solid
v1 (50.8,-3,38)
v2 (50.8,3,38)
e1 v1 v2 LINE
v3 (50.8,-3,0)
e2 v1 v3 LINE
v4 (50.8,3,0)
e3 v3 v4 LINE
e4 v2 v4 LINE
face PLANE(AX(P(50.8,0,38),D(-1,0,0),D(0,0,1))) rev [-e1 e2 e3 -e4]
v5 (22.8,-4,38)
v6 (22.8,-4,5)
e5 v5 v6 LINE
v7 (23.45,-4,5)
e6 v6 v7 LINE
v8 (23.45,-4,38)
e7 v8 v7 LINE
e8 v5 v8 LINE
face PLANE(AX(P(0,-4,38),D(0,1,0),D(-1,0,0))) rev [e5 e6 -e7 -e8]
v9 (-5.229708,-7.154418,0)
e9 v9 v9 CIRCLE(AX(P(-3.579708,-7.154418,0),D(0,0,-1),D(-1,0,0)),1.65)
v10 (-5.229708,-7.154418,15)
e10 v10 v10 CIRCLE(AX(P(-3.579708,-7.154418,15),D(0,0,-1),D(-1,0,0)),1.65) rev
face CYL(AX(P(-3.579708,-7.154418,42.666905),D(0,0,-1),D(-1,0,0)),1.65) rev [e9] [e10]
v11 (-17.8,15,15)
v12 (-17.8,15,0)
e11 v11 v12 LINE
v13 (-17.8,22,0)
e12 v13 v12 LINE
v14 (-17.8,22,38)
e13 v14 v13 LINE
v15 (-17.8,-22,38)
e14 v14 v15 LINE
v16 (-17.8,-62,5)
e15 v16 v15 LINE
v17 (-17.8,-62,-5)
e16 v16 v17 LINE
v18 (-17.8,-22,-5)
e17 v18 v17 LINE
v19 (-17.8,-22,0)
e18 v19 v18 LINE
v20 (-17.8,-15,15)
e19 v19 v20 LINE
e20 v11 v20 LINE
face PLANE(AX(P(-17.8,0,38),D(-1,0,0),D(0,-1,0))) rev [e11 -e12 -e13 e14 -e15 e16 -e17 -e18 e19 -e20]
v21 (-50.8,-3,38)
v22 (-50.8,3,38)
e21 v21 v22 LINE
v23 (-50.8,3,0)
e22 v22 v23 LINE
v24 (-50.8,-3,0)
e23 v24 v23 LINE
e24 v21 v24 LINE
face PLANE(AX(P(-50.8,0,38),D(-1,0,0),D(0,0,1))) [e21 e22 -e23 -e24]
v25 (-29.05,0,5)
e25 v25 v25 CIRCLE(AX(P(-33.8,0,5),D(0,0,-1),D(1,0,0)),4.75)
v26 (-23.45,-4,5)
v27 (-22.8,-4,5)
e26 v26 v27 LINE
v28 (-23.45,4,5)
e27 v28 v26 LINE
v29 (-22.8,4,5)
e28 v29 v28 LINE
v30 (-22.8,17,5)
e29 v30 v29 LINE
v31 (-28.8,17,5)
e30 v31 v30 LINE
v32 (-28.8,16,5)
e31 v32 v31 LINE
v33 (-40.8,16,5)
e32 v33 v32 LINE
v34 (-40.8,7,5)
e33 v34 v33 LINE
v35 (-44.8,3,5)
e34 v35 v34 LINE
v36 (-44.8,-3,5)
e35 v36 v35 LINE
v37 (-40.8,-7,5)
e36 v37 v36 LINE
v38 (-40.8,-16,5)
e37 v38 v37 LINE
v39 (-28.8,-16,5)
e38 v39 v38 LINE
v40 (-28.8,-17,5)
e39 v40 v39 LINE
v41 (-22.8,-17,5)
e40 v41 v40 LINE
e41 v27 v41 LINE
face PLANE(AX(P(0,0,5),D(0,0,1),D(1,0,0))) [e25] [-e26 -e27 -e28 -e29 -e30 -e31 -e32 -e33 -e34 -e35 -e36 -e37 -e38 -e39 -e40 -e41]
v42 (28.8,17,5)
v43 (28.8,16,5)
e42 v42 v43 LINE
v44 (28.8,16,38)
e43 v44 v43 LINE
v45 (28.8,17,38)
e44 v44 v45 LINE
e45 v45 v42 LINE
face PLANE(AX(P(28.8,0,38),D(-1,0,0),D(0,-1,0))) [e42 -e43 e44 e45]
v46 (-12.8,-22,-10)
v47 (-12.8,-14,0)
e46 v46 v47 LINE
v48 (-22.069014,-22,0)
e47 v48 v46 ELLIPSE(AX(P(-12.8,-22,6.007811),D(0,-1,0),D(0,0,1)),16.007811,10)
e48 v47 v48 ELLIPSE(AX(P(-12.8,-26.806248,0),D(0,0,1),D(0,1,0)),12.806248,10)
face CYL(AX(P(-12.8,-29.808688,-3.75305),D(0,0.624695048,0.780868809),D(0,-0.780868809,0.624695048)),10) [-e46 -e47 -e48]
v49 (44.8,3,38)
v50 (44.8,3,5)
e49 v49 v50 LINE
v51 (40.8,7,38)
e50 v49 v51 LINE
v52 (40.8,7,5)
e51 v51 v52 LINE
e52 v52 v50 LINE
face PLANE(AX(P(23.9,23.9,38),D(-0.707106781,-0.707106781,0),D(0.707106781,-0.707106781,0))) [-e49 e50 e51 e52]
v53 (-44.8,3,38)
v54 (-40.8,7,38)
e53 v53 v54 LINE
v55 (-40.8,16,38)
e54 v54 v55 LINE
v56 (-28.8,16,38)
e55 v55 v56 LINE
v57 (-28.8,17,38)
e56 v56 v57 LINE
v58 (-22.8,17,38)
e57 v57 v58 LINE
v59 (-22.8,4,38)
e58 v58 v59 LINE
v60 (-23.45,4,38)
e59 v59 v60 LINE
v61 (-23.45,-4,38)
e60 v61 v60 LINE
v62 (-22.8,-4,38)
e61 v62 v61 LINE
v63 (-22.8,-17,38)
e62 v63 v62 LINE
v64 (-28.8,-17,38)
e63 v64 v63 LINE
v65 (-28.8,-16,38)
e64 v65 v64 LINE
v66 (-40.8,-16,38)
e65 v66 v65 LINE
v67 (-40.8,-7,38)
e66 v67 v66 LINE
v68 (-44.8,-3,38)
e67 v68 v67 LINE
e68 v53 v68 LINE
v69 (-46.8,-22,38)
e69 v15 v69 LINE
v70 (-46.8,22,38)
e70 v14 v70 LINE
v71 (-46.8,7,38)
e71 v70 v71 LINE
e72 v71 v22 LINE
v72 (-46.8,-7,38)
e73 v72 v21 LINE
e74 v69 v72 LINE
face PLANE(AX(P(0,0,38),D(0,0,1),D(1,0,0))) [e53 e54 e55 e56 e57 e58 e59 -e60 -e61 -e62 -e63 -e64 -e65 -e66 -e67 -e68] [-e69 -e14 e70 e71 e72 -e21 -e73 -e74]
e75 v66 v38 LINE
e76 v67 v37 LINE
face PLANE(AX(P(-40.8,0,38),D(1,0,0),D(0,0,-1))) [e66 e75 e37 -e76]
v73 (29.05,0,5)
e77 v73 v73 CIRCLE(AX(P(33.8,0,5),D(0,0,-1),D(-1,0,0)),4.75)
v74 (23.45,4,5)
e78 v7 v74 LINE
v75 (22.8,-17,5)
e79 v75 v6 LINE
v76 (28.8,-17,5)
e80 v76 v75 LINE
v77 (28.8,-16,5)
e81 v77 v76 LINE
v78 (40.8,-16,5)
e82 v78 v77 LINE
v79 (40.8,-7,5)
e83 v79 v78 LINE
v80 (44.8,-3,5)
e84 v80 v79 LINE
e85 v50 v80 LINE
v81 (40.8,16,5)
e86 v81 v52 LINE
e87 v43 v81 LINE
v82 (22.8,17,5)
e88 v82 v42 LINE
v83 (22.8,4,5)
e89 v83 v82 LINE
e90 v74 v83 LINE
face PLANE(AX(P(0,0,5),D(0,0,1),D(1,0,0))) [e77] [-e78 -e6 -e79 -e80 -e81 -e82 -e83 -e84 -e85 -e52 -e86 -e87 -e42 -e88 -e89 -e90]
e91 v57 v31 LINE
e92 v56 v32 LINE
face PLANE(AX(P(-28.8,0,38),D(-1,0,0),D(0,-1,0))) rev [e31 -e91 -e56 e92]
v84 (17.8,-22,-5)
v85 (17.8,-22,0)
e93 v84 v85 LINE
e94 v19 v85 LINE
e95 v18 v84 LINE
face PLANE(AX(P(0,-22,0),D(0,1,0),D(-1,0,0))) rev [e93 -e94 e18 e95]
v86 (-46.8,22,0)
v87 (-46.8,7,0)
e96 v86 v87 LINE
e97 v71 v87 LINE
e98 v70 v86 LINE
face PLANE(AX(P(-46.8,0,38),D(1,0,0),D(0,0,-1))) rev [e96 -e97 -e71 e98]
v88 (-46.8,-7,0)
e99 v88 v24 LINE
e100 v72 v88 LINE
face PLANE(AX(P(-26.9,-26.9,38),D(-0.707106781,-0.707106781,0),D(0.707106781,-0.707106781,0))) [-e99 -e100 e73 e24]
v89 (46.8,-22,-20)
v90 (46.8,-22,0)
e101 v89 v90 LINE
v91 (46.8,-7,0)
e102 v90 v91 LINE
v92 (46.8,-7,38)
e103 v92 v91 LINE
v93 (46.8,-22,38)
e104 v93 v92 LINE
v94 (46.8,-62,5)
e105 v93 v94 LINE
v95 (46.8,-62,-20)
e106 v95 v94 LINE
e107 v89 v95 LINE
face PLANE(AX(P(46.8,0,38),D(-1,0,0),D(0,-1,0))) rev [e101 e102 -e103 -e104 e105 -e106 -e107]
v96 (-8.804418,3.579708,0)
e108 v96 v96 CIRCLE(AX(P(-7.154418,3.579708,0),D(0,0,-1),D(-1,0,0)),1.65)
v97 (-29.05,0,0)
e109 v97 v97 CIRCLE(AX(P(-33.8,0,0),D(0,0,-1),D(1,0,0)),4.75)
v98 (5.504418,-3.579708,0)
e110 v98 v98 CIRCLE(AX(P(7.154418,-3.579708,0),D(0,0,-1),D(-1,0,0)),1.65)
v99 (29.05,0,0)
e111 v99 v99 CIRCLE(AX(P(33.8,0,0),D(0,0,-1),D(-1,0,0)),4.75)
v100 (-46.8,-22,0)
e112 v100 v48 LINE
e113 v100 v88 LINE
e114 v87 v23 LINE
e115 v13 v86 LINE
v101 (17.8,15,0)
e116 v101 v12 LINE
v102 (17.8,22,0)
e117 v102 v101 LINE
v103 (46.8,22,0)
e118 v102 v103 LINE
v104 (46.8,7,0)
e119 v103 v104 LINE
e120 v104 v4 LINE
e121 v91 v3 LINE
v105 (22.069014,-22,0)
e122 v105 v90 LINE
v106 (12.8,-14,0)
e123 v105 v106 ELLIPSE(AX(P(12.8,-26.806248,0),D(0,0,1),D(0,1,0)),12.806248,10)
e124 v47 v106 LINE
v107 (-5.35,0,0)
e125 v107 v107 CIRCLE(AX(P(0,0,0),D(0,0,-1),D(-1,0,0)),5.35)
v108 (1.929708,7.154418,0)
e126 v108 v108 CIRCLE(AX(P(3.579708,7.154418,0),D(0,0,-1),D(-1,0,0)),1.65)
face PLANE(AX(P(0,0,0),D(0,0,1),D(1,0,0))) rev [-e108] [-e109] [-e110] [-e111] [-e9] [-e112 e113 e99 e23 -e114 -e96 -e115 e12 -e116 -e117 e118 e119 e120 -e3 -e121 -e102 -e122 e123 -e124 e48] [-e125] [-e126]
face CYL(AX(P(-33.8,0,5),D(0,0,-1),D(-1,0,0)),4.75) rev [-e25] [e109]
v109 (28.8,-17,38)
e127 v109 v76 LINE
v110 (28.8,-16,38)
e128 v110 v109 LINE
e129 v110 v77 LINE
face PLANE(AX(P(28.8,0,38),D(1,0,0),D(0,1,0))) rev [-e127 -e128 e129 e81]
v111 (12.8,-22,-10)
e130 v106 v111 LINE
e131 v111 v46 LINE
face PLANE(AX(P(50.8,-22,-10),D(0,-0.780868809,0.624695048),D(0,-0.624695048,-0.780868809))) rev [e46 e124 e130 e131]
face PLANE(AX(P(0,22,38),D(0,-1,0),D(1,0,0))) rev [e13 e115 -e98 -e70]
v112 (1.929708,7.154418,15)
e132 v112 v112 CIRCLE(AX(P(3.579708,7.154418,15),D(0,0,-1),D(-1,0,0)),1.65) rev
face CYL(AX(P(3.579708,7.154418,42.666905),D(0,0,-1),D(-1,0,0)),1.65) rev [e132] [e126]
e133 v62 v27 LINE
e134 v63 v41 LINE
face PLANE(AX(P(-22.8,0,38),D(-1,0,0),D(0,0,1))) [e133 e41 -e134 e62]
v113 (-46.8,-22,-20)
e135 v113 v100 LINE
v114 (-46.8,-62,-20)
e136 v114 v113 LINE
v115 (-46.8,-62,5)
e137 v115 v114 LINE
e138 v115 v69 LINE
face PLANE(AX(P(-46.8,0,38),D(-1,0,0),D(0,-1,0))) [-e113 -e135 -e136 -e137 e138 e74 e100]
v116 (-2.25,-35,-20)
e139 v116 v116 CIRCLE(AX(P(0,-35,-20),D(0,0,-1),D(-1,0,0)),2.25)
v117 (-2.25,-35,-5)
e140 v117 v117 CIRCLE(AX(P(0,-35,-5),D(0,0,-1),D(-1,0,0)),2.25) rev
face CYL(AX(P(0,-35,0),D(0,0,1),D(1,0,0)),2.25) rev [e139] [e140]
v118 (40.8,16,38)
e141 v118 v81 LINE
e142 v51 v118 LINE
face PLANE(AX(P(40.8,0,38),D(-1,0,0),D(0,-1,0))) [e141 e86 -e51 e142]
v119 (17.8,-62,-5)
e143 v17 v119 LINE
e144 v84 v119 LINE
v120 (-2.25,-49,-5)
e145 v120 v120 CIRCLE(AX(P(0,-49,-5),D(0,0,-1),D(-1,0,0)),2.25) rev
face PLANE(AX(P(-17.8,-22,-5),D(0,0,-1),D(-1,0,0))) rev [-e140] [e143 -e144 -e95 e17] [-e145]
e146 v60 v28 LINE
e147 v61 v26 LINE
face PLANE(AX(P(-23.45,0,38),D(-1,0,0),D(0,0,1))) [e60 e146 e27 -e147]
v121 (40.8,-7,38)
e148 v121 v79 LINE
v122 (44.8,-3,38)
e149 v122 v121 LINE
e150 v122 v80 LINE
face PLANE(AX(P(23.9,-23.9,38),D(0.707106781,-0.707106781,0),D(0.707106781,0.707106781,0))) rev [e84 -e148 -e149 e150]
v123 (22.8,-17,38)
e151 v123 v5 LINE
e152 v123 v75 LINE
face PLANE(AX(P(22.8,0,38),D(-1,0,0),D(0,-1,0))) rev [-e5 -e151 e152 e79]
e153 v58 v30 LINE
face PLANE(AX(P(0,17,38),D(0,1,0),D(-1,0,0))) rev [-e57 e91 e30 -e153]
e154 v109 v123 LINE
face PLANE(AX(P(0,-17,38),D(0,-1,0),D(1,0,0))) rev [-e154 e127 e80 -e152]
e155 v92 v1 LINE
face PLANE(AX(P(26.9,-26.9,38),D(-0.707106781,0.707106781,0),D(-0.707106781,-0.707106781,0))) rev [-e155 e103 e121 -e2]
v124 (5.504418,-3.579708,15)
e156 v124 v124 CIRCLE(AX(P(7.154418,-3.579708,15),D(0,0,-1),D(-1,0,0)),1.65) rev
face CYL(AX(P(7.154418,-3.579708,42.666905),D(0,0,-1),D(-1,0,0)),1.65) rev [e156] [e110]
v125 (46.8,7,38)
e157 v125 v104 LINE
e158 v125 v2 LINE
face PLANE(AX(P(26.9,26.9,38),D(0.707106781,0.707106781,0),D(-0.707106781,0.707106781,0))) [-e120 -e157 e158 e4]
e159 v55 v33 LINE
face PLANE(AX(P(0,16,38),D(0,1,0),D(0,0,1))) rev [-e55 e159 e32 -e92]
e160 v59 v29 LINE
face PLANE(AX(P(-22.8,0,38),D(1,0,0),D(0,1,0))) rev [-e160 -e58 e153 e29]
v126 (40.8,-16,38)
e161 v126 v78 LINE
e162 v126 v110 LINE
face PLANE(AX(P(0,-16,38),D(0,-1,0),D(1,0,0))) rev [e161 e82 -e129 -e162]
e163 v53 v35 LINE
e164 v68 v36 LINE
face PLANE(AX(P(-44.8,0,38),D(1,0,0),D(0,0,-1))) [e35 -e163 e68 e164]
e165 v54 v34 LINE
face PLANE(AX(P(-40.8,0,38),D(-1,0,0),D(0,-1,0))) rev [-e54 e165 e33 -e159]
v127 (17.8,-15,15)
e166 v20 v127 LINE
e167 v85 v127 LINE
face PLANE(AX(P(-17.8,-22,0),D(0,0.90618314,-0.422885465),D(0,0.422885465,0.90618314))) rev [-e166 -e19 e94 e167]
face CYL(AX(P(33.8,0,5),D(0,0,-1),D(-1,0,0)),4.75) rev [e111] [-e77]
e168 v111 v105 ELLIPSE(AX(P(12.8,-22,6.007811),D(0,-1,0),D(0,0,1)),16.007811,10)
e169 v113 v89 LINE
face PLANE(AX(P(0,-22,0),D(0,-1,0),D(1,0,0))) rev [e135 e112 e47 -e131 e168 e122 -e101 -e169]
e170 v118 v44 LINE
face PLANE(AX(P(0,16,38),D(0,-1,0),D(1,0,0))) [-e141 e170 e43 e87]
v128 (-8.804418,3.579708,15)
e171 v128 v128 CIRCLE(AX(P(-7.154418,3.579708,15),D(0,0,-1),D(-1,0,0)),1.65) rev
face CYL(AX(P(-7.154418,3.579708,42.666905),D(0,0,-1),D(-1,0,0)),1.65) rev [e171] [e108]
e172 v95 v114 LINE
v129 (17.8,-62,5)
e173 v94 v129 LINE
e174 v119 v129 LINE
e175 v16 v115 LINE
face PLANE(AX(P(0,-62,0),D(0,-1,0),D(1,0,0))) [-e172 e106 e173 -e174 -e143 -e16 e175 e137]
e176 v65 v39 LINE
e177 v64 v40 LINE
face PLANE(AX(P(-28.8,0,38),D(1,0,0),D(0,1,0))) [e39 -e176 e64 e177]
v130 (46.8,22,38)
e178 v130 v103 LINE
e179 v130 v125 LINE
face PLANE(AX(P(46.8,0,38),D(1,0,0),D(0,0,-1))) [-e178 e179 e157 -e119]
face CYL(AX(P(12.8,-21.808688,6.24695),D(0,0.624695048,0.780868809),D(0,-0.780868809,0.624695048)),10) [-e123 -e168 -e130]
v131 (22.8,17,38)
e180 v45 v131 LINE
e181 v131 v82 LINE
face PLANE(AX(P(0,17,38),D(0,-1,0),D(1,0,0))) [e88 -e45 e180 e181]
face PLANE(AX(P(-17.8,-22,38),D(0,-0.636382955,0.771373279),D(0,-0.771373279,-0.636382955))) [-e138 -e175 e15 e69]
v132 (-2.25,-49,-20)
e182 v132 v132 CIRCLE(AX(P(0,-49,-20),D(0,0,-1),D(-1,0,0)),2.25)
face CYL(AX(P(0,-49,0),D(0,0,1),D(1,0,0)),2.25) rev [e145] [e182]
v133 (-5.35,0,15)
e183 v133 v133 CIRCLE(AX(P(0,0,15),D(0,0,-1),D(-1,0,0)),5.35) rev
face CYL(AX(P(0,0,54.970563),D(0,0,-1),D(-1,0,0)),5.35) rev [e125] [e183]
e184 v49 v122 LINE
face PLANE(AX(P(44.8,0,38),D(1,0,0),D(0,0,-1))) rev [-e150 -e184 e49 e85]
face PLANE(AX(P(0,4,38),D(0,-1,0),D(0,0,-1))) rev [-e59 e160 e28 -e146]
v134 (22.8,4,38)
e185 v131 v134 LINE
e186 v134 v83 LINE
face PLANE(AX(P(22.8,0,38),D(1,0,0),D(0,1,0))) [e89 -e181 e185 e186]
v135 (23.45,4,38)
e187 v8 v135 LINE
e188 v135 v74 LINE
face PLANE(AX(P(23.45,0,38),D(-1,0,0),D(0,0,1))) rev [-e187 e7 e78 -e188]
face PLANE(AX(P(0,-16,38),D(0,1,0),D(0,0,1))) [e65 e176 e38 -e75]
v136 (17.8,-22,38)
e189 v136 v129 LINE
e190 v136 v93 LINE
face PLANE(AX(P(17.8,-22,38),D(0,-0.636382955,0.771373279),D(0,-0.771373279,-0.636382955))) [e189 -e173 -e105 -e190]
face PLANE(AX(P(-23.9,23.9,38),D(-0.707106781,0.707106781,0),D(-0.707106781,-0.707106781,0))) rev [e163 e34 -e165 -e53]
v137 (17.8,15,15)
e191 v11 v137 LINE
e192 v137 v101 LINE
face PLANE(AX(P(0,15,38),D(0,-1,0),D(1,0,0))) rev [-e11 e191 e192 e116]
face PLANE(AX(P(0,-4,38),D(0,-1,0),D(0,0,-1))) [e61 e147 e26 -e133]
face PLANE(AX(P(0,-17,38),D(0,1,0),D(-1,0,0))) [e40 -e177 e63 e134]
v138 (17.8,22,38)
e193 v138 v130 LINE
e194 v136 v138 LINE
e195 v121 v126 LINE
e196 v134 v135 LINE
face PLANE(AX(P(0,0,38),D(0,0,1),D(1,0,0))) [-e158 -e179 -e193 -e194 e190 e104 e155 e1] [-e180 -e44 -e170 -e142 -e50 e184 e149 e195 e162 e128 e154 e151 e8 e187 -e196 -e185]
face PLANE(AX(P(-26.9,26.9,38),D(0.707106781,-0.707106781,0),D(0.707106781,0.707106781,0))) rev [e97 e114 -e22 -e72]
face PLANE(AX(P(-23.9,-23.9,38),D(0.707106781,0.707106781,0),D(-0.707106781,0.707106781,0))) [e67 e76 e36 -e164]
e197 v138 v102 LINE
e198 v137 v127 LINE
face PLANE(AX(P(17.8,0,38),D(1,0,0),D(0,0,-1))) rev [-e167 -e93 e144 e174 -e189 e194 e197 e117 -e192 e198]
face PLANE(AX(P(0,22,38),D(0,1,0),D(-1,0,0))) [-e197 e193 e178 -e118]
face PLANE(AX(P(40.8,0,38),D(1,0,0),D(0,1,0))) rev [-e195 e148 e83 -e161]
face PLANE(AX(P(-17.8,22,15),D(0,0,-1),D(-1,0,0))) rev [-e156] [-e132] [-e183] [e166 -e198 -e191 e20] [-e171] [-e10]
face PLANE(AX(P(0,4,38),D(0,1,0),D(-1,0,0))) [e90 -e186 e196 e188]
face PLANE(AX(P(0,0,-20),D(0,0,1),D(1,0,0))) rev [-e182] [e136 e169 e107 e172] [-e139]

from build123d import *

# Parameters (mm, degrees)
CROQUIS1_R               = 6
SALIENTE_EXTRUIR1_DEPTH  = 38
CROQUIS4_R               = 4.75
SALIENTE_EXTRUIR3_DEPTH  = 5
CROQUIS7_R               = 6
CROQUIS7_R_2             = 5.35
SALIENTE_EXTRUIR4_DEPTH  = 38
CROQUIS8_R               = 1.65
CORTAR_EXTRUIR3_DEPTH    = 38
CROQUIS9_W               = 35.6
CROQUIS9_H               = 23
CORTAR_EXTRUIR4_DEPTH    = 74.441405215
CROQUIS10_W              = 93.6
CROQUIS10_H              = 5
SALIENTE_EXTRUIR5_DEPTH  = 40
CROQUIS11_R              = 2.25
CORTAR_EXTRUIR5_DEPTH    = 87.681255182
CROQUIS14_R              = 2.25
SALIENTE_EXTRUIR6_DEPTH  = 20
SALIENTE_EXTRUIR7_START  = -29
SALIENTE_EXTRUIR7_DEPTH  = 29
SALIENTE_EXTRUIR8_START  = -29
SALIENTE_EXTRUIR8_DEPTH  = 29
CROQUIS17_W              = 35.6
CROQUIS17_H              = 10
CORTAR_EXTRUIR6_DEPTH    = 40
CROQUIS23_W              = 45.6
CROQUIS23_H              = 10
SALIENTE_EXTRUIR11_DEPTH = 8
CORTAR_EXTRUIR7_DEPTH    = 104.464776615
REDONDEO4_R              = 10
SALIENTE_EXTRUIR12_DEPTH = 35.6


with BuildPart() as part:
    # Croquis1 → Saliente-Extruir1 (new body)
    with BuildSketch(Plane.XY):
        Polygon((-50.8, -3), (-50.8, 3), (-46.8, 7), (-46.8, 22), (-17.8, 22), (-17.8, 15), (17.8, 15), (17.8, 22), (46.8, 22), (46.8, 7), (50.8, 3), (50.8, -3), (46.8, -7), (46.8, -22), (17.8, -22), (17.8, -15), (-17.8, -15), (-17.8, -22), (-46.8, -22), (-46.8, -7), align=None)
        Circle(CROQUIS1_R, mode=Mode.SUBTRACT)
        Polygon((-22.8, 4), (-23.45, 4), (-23.45, -4), (-22.8, -4), (-22.8, -17), (-28.8, -17), (-28.8, -16), (-40.8, -16), (-40.8, -7), (-44.8, -3), (-44.8, 3), (-40.8, 7), (-40.8, 16), (-28.8, 16), (-28.8, 17), (-22.8, 17), align=None, mode=Mode.SUBTRACT)
        Polygon((23.45, -4), (23.45, 4), (22.8, 4), (22.8, 17), (28.8, 17), (28.8, 16), (40.8, 16), (40.8, 7), (44.8, 3), (44.8, -3), (40.8, -7), (40.8, -16), (28.8, -16), (28.8, -17), (22.8, -17), (22.8, -4), align=None, mode=Mode.SUBTRACT)
    extrude(amount=SALIENTE_EXTRUIR1_DEPTH)

    # Croquis4 → Saliente-Extruir3 (add)
    # profile 1 of 2: a face of its own
    with BuildSketch(Plane(origin=(0, 0, 0), x_dir=(-1, 0, 0), z_dir=(0, 0, -1))):
        Polygon((-40.8, 16), (-28.8, 16), (-28.8, 17), (-22.8, 17), (-22.8, 4), (-23.45, 4), (-23.45, -4), (-22.8, -4), (-22.8, -17), (-28.8, -17), (-28.8, -16), (-40.8, -16), (-40.8, -7), (-44.8, -3), (-44.8, 3), (-40.8, 7), align=None)
        with Locations((-33.8, 0)):
            Circle(CROQUIS4_R, mode=Mode.SUBTRACT)
    # profile 2 of 2: a face of its own
    with BuildSketch(Plane(origin=(0, 0, 0), x_dir=(-1, 0, 0), z_dir=(0, 0, -1))):
        Polygon((40.8, 7), (40.8, 16), (28.8, 16), (28.8, 17), (22.8, 17), (22.8, 4), (23.45, 4), (23.45, -4), (22.8, -4), (22.8, -17), (28.8, -17), (28.8, -16), (40.8, -16), (40.8, -7), (44.8, -3), (44.8, 3), align=None)
        with Locations(Location((33.8, 0, 0), (0, 0, 180))):
            Circle(CROQUIS4_R, mode=Mode.SUBTRACT)
    extrude(amount=-SALIENTE_EXTRUIR3_DEPTH)

    # Croquis7 → Saliente-Extruir4 (add)
    with BuildSketch(Plane(origin=(0, 0, 0), x_dir=(-1, 0, 0), z_dir=(0, 0, -1))):
        Circle(CROQUIS7_R)
        Circle(CROQUIS7_R_2, mode=Mode.SUBTRACT)
    extrude(amount=-SALIENTE_EXTRUIR4_DEPTH)

    # Croquis8 → Cortar-Extruir3 (cut)
    with BuildSketch(Plane(origin=(0, 0, 0), x_dir=(-1, 0, 0), z_dir=(0, 0, -1))):
        with Locations((-7.15441776, -3.579707868)):
            Circle(CROQUIS8_R)
        with Locations((3.579707868, -7.15441776)):
            Circle(CROQUIS8_R)
        with Locations((7.15441776, 3.579707868)):
            Circle(CROQUIS8_R)
        with Locations((-3.579707868, 7.15441776)):
            Circle(CROQUIS8_R)
    extrude(amount=-CORTAR_EXTRUIR3_DEPTH, mode=Mode.SUBTRACT)

    # Croquis9 → Cortar-Extruir4 (cut, through all)
    with BuildSketch(Plane.XZ.offset(15)):
        with Locations((0, 26.5)):
            Rectangle(CROQUIS9_W, CROQUIS9_H)
    extrude(amount=-CORTAR_EXTRUIR4_DEPTH, mode=Mode.SUBTRACT)

    # Croquis10 → Saliente-Extruir5 (add)
    with BuildSketch(Plane.XZ.offset(22)):
        with Locations((0, 2.5)):
            Rectangle(CROQUIS10_W, CROQUIS10_H)
    extrude(amount=SALIENTE_EXTRUIR5_DEPTH)

    # Croquis11 → Cortar-Extruir5 (cut, through all)
    with BuildSketch(Plane.XY.offset(5)):
        with Locations((0, -35)):
            Circle(CROQUIS11_R)
        with Locations((0, -49)):
            Circle(CROQUIS11_R)
    extrude(amount=-CORTAR_EXTRUIR5_DEPTH, mode=Mode.SUBTRACT)

    # Croquis14 → Saliente-Extruir6 (add)
    with BuildSketch(Plane(origin=(0, 0, 0), x_dir=(-1, 0, 0), z_dir=(0, 0, -1))):
        Polygon((17.8, -22), (46.8, -22), (46.8, -62), (-46.8, -62), (-46.8, -22), align=None)
        with Locations(Location((0, -35, 0), (0, 0, 180))):
            Circle(CROQUIS14_R, mode=Mode.SUBTRACT)
        with Locations(Location((0, -49, 0), (0, 0, 180))):
            Circle(CROQUIS14_R, mode=Mode.SUBTRACT)
    extrude(amount=SALIENTE_EXTRUIR6_DEPTH)

    # Croquis15 → Saliente-Extruir7 (add)
    with BuildSketch(Plane.ZY.offset(46.8).offset(SALIENTE_EXTRUIR7_START)):
        Polygon((38, -22), (5, -62), (5, -22), align=None)
    extrude(amount=SALIENTE_EXTRUIR7_DEPTH)

    # Croquis16 → Saliente-Extruir8 (add)
    with BuildSketch(Plane(origin=(46.8, 0, 0), x_dir=(0, 0, -1), z_dir=(1, 0, 0)).offset(SALIENTE_EXTRUIR8_START)):
        Polygon((-38, -22), (-5, -62), (-5, -22), align=None)
    extrude(amount=SALIENTE_EXTRUIR8_DEPTH)

    # Croquis17 → Cortar-Extruir6 (cut)
    with BuildSketch(Plane.XZ.offset(62)):
        Rectangle(CROQUIS17_W, CROQUIS17_H)
    extrude(amount=-CORTAR_EXTRUIR6_DEPTH, mode=Mode.SUBTRACT)

    # Croquis23 → Saliente-Extruir11 (add)
    with BuildSketch(Plane(origin=(0, -22, 0), x_dir=(1, 0, 0), z_dir=(0, 1, 0))):
        with Locations((0, 5)):
            Rectangle(CROQUIS23_W, CROQUIS23_H)
    extrude(amount=SALIENTE_EXTRUIR11_DEPTH)

    # Croquis24 → Cortar-Extruir7 (cut, through all)
    with BuildSketch(Plane.ZY.offset(22.8)):
        Polygon((-10, -22), (0, -14), (-10, -14), align=None)
    extrude(amount=-CORTAR_EXTRUIR7_DEPTH, mode=Mode.SUBTRACT)

    # Redondeo4
    # the kernel refuses this fillet: 10 mm, written as the material it takes off along each edge
    with BuildSketch(Plane(origin=(-22.8, -37.617376189, -29.521720236), x_dir=(1, 0, 0), z_dir=(0, 0.6246950475544245, 0.7808688094430302))) as redondeo4_piece_1_section:
        with BuildLine():
            CenterArc((REDONDEO4_R, -REDONDEO4_R), REDONDEO4_R, 90, 90)
            Line((0, -REDONDEO4_R), (0, 0))
            Line((0, 0), (REDONDEO4_R, 0))
        make_face()
    redondeo4_piece_1 = extrude(amount=62.806248475, mode=Mode.PRIVATE)
    redondeo4_piece_1 = split(redondeo4_piece_1, bisect_by=Plane(origin=(-20.122466275, -22, -4.721973229), z_dir=(0, 1, 0)), keep=Keep.TOP, mode=Mode.PRIVATE)
    redondeo4_piece_1 = split(redondeo4_piece_1, bisect_by=Plane(origin=(-20.122466275, -19.662128578, 0), z_dir=(0, 0, -1)), keep=Keep.TOP, mode=Mode.PRIVATE)
    add(redondeo4_piece_1, mode=Mode.SUBTRACT)
    with BuildSketch(Plane(origin=(22.8, -37.617376189, -29.521720236), x_dir=(0, -0.7808688094430302, 0.6246950475544245), z_dir=(0, 0.6246950475544245, 0.7808688094430302))) as redondeo4_piece_2_section:
        with BuildLine():
            CenterArc((REDONDEO4_R, -REDONDEO4_R), REDONDEO4_R, 90, 90)
            Line((0, -REDONDEO4_R), (0, 0))
            Line((0, 0), (REDONDEO4_R, 0))
        make_face()
    redondeo4_piece_2 = extrude(amount=62.806248475, mode=Mode.PRIVATE)
    redondeo4_piece_2 = split(redondeo4_piece_2, bisect_by=Plane(origin=(20.122466276, -22, -4.72197323), z_dir=(0, 1, 0)), keep=Keep.TOP, mode=Mode.PRIVATE)
    redondeo4_piece_2 = split(redondeo4_piece_2, bisect_by=Plane(origin=(20.122466276, -19.662128579, 0), z_dir=(0, 0, -1)), keep=Keep.TOP, mode=Mode.PRIVATE)
    add(redondeo4_piece_2, mode=Mode.SUBTRACT)

    # Croquis25 → Saliente-Extruir12 (add)
    with BuildSketch(Plane.ZY.offset(-17.8)):
        Polygon((0, -22), (15, -15), (0, -15), align=None)
    extrude(amount=SALIENTE_EXTRUIR12_DEPTH)


solid = part.part
